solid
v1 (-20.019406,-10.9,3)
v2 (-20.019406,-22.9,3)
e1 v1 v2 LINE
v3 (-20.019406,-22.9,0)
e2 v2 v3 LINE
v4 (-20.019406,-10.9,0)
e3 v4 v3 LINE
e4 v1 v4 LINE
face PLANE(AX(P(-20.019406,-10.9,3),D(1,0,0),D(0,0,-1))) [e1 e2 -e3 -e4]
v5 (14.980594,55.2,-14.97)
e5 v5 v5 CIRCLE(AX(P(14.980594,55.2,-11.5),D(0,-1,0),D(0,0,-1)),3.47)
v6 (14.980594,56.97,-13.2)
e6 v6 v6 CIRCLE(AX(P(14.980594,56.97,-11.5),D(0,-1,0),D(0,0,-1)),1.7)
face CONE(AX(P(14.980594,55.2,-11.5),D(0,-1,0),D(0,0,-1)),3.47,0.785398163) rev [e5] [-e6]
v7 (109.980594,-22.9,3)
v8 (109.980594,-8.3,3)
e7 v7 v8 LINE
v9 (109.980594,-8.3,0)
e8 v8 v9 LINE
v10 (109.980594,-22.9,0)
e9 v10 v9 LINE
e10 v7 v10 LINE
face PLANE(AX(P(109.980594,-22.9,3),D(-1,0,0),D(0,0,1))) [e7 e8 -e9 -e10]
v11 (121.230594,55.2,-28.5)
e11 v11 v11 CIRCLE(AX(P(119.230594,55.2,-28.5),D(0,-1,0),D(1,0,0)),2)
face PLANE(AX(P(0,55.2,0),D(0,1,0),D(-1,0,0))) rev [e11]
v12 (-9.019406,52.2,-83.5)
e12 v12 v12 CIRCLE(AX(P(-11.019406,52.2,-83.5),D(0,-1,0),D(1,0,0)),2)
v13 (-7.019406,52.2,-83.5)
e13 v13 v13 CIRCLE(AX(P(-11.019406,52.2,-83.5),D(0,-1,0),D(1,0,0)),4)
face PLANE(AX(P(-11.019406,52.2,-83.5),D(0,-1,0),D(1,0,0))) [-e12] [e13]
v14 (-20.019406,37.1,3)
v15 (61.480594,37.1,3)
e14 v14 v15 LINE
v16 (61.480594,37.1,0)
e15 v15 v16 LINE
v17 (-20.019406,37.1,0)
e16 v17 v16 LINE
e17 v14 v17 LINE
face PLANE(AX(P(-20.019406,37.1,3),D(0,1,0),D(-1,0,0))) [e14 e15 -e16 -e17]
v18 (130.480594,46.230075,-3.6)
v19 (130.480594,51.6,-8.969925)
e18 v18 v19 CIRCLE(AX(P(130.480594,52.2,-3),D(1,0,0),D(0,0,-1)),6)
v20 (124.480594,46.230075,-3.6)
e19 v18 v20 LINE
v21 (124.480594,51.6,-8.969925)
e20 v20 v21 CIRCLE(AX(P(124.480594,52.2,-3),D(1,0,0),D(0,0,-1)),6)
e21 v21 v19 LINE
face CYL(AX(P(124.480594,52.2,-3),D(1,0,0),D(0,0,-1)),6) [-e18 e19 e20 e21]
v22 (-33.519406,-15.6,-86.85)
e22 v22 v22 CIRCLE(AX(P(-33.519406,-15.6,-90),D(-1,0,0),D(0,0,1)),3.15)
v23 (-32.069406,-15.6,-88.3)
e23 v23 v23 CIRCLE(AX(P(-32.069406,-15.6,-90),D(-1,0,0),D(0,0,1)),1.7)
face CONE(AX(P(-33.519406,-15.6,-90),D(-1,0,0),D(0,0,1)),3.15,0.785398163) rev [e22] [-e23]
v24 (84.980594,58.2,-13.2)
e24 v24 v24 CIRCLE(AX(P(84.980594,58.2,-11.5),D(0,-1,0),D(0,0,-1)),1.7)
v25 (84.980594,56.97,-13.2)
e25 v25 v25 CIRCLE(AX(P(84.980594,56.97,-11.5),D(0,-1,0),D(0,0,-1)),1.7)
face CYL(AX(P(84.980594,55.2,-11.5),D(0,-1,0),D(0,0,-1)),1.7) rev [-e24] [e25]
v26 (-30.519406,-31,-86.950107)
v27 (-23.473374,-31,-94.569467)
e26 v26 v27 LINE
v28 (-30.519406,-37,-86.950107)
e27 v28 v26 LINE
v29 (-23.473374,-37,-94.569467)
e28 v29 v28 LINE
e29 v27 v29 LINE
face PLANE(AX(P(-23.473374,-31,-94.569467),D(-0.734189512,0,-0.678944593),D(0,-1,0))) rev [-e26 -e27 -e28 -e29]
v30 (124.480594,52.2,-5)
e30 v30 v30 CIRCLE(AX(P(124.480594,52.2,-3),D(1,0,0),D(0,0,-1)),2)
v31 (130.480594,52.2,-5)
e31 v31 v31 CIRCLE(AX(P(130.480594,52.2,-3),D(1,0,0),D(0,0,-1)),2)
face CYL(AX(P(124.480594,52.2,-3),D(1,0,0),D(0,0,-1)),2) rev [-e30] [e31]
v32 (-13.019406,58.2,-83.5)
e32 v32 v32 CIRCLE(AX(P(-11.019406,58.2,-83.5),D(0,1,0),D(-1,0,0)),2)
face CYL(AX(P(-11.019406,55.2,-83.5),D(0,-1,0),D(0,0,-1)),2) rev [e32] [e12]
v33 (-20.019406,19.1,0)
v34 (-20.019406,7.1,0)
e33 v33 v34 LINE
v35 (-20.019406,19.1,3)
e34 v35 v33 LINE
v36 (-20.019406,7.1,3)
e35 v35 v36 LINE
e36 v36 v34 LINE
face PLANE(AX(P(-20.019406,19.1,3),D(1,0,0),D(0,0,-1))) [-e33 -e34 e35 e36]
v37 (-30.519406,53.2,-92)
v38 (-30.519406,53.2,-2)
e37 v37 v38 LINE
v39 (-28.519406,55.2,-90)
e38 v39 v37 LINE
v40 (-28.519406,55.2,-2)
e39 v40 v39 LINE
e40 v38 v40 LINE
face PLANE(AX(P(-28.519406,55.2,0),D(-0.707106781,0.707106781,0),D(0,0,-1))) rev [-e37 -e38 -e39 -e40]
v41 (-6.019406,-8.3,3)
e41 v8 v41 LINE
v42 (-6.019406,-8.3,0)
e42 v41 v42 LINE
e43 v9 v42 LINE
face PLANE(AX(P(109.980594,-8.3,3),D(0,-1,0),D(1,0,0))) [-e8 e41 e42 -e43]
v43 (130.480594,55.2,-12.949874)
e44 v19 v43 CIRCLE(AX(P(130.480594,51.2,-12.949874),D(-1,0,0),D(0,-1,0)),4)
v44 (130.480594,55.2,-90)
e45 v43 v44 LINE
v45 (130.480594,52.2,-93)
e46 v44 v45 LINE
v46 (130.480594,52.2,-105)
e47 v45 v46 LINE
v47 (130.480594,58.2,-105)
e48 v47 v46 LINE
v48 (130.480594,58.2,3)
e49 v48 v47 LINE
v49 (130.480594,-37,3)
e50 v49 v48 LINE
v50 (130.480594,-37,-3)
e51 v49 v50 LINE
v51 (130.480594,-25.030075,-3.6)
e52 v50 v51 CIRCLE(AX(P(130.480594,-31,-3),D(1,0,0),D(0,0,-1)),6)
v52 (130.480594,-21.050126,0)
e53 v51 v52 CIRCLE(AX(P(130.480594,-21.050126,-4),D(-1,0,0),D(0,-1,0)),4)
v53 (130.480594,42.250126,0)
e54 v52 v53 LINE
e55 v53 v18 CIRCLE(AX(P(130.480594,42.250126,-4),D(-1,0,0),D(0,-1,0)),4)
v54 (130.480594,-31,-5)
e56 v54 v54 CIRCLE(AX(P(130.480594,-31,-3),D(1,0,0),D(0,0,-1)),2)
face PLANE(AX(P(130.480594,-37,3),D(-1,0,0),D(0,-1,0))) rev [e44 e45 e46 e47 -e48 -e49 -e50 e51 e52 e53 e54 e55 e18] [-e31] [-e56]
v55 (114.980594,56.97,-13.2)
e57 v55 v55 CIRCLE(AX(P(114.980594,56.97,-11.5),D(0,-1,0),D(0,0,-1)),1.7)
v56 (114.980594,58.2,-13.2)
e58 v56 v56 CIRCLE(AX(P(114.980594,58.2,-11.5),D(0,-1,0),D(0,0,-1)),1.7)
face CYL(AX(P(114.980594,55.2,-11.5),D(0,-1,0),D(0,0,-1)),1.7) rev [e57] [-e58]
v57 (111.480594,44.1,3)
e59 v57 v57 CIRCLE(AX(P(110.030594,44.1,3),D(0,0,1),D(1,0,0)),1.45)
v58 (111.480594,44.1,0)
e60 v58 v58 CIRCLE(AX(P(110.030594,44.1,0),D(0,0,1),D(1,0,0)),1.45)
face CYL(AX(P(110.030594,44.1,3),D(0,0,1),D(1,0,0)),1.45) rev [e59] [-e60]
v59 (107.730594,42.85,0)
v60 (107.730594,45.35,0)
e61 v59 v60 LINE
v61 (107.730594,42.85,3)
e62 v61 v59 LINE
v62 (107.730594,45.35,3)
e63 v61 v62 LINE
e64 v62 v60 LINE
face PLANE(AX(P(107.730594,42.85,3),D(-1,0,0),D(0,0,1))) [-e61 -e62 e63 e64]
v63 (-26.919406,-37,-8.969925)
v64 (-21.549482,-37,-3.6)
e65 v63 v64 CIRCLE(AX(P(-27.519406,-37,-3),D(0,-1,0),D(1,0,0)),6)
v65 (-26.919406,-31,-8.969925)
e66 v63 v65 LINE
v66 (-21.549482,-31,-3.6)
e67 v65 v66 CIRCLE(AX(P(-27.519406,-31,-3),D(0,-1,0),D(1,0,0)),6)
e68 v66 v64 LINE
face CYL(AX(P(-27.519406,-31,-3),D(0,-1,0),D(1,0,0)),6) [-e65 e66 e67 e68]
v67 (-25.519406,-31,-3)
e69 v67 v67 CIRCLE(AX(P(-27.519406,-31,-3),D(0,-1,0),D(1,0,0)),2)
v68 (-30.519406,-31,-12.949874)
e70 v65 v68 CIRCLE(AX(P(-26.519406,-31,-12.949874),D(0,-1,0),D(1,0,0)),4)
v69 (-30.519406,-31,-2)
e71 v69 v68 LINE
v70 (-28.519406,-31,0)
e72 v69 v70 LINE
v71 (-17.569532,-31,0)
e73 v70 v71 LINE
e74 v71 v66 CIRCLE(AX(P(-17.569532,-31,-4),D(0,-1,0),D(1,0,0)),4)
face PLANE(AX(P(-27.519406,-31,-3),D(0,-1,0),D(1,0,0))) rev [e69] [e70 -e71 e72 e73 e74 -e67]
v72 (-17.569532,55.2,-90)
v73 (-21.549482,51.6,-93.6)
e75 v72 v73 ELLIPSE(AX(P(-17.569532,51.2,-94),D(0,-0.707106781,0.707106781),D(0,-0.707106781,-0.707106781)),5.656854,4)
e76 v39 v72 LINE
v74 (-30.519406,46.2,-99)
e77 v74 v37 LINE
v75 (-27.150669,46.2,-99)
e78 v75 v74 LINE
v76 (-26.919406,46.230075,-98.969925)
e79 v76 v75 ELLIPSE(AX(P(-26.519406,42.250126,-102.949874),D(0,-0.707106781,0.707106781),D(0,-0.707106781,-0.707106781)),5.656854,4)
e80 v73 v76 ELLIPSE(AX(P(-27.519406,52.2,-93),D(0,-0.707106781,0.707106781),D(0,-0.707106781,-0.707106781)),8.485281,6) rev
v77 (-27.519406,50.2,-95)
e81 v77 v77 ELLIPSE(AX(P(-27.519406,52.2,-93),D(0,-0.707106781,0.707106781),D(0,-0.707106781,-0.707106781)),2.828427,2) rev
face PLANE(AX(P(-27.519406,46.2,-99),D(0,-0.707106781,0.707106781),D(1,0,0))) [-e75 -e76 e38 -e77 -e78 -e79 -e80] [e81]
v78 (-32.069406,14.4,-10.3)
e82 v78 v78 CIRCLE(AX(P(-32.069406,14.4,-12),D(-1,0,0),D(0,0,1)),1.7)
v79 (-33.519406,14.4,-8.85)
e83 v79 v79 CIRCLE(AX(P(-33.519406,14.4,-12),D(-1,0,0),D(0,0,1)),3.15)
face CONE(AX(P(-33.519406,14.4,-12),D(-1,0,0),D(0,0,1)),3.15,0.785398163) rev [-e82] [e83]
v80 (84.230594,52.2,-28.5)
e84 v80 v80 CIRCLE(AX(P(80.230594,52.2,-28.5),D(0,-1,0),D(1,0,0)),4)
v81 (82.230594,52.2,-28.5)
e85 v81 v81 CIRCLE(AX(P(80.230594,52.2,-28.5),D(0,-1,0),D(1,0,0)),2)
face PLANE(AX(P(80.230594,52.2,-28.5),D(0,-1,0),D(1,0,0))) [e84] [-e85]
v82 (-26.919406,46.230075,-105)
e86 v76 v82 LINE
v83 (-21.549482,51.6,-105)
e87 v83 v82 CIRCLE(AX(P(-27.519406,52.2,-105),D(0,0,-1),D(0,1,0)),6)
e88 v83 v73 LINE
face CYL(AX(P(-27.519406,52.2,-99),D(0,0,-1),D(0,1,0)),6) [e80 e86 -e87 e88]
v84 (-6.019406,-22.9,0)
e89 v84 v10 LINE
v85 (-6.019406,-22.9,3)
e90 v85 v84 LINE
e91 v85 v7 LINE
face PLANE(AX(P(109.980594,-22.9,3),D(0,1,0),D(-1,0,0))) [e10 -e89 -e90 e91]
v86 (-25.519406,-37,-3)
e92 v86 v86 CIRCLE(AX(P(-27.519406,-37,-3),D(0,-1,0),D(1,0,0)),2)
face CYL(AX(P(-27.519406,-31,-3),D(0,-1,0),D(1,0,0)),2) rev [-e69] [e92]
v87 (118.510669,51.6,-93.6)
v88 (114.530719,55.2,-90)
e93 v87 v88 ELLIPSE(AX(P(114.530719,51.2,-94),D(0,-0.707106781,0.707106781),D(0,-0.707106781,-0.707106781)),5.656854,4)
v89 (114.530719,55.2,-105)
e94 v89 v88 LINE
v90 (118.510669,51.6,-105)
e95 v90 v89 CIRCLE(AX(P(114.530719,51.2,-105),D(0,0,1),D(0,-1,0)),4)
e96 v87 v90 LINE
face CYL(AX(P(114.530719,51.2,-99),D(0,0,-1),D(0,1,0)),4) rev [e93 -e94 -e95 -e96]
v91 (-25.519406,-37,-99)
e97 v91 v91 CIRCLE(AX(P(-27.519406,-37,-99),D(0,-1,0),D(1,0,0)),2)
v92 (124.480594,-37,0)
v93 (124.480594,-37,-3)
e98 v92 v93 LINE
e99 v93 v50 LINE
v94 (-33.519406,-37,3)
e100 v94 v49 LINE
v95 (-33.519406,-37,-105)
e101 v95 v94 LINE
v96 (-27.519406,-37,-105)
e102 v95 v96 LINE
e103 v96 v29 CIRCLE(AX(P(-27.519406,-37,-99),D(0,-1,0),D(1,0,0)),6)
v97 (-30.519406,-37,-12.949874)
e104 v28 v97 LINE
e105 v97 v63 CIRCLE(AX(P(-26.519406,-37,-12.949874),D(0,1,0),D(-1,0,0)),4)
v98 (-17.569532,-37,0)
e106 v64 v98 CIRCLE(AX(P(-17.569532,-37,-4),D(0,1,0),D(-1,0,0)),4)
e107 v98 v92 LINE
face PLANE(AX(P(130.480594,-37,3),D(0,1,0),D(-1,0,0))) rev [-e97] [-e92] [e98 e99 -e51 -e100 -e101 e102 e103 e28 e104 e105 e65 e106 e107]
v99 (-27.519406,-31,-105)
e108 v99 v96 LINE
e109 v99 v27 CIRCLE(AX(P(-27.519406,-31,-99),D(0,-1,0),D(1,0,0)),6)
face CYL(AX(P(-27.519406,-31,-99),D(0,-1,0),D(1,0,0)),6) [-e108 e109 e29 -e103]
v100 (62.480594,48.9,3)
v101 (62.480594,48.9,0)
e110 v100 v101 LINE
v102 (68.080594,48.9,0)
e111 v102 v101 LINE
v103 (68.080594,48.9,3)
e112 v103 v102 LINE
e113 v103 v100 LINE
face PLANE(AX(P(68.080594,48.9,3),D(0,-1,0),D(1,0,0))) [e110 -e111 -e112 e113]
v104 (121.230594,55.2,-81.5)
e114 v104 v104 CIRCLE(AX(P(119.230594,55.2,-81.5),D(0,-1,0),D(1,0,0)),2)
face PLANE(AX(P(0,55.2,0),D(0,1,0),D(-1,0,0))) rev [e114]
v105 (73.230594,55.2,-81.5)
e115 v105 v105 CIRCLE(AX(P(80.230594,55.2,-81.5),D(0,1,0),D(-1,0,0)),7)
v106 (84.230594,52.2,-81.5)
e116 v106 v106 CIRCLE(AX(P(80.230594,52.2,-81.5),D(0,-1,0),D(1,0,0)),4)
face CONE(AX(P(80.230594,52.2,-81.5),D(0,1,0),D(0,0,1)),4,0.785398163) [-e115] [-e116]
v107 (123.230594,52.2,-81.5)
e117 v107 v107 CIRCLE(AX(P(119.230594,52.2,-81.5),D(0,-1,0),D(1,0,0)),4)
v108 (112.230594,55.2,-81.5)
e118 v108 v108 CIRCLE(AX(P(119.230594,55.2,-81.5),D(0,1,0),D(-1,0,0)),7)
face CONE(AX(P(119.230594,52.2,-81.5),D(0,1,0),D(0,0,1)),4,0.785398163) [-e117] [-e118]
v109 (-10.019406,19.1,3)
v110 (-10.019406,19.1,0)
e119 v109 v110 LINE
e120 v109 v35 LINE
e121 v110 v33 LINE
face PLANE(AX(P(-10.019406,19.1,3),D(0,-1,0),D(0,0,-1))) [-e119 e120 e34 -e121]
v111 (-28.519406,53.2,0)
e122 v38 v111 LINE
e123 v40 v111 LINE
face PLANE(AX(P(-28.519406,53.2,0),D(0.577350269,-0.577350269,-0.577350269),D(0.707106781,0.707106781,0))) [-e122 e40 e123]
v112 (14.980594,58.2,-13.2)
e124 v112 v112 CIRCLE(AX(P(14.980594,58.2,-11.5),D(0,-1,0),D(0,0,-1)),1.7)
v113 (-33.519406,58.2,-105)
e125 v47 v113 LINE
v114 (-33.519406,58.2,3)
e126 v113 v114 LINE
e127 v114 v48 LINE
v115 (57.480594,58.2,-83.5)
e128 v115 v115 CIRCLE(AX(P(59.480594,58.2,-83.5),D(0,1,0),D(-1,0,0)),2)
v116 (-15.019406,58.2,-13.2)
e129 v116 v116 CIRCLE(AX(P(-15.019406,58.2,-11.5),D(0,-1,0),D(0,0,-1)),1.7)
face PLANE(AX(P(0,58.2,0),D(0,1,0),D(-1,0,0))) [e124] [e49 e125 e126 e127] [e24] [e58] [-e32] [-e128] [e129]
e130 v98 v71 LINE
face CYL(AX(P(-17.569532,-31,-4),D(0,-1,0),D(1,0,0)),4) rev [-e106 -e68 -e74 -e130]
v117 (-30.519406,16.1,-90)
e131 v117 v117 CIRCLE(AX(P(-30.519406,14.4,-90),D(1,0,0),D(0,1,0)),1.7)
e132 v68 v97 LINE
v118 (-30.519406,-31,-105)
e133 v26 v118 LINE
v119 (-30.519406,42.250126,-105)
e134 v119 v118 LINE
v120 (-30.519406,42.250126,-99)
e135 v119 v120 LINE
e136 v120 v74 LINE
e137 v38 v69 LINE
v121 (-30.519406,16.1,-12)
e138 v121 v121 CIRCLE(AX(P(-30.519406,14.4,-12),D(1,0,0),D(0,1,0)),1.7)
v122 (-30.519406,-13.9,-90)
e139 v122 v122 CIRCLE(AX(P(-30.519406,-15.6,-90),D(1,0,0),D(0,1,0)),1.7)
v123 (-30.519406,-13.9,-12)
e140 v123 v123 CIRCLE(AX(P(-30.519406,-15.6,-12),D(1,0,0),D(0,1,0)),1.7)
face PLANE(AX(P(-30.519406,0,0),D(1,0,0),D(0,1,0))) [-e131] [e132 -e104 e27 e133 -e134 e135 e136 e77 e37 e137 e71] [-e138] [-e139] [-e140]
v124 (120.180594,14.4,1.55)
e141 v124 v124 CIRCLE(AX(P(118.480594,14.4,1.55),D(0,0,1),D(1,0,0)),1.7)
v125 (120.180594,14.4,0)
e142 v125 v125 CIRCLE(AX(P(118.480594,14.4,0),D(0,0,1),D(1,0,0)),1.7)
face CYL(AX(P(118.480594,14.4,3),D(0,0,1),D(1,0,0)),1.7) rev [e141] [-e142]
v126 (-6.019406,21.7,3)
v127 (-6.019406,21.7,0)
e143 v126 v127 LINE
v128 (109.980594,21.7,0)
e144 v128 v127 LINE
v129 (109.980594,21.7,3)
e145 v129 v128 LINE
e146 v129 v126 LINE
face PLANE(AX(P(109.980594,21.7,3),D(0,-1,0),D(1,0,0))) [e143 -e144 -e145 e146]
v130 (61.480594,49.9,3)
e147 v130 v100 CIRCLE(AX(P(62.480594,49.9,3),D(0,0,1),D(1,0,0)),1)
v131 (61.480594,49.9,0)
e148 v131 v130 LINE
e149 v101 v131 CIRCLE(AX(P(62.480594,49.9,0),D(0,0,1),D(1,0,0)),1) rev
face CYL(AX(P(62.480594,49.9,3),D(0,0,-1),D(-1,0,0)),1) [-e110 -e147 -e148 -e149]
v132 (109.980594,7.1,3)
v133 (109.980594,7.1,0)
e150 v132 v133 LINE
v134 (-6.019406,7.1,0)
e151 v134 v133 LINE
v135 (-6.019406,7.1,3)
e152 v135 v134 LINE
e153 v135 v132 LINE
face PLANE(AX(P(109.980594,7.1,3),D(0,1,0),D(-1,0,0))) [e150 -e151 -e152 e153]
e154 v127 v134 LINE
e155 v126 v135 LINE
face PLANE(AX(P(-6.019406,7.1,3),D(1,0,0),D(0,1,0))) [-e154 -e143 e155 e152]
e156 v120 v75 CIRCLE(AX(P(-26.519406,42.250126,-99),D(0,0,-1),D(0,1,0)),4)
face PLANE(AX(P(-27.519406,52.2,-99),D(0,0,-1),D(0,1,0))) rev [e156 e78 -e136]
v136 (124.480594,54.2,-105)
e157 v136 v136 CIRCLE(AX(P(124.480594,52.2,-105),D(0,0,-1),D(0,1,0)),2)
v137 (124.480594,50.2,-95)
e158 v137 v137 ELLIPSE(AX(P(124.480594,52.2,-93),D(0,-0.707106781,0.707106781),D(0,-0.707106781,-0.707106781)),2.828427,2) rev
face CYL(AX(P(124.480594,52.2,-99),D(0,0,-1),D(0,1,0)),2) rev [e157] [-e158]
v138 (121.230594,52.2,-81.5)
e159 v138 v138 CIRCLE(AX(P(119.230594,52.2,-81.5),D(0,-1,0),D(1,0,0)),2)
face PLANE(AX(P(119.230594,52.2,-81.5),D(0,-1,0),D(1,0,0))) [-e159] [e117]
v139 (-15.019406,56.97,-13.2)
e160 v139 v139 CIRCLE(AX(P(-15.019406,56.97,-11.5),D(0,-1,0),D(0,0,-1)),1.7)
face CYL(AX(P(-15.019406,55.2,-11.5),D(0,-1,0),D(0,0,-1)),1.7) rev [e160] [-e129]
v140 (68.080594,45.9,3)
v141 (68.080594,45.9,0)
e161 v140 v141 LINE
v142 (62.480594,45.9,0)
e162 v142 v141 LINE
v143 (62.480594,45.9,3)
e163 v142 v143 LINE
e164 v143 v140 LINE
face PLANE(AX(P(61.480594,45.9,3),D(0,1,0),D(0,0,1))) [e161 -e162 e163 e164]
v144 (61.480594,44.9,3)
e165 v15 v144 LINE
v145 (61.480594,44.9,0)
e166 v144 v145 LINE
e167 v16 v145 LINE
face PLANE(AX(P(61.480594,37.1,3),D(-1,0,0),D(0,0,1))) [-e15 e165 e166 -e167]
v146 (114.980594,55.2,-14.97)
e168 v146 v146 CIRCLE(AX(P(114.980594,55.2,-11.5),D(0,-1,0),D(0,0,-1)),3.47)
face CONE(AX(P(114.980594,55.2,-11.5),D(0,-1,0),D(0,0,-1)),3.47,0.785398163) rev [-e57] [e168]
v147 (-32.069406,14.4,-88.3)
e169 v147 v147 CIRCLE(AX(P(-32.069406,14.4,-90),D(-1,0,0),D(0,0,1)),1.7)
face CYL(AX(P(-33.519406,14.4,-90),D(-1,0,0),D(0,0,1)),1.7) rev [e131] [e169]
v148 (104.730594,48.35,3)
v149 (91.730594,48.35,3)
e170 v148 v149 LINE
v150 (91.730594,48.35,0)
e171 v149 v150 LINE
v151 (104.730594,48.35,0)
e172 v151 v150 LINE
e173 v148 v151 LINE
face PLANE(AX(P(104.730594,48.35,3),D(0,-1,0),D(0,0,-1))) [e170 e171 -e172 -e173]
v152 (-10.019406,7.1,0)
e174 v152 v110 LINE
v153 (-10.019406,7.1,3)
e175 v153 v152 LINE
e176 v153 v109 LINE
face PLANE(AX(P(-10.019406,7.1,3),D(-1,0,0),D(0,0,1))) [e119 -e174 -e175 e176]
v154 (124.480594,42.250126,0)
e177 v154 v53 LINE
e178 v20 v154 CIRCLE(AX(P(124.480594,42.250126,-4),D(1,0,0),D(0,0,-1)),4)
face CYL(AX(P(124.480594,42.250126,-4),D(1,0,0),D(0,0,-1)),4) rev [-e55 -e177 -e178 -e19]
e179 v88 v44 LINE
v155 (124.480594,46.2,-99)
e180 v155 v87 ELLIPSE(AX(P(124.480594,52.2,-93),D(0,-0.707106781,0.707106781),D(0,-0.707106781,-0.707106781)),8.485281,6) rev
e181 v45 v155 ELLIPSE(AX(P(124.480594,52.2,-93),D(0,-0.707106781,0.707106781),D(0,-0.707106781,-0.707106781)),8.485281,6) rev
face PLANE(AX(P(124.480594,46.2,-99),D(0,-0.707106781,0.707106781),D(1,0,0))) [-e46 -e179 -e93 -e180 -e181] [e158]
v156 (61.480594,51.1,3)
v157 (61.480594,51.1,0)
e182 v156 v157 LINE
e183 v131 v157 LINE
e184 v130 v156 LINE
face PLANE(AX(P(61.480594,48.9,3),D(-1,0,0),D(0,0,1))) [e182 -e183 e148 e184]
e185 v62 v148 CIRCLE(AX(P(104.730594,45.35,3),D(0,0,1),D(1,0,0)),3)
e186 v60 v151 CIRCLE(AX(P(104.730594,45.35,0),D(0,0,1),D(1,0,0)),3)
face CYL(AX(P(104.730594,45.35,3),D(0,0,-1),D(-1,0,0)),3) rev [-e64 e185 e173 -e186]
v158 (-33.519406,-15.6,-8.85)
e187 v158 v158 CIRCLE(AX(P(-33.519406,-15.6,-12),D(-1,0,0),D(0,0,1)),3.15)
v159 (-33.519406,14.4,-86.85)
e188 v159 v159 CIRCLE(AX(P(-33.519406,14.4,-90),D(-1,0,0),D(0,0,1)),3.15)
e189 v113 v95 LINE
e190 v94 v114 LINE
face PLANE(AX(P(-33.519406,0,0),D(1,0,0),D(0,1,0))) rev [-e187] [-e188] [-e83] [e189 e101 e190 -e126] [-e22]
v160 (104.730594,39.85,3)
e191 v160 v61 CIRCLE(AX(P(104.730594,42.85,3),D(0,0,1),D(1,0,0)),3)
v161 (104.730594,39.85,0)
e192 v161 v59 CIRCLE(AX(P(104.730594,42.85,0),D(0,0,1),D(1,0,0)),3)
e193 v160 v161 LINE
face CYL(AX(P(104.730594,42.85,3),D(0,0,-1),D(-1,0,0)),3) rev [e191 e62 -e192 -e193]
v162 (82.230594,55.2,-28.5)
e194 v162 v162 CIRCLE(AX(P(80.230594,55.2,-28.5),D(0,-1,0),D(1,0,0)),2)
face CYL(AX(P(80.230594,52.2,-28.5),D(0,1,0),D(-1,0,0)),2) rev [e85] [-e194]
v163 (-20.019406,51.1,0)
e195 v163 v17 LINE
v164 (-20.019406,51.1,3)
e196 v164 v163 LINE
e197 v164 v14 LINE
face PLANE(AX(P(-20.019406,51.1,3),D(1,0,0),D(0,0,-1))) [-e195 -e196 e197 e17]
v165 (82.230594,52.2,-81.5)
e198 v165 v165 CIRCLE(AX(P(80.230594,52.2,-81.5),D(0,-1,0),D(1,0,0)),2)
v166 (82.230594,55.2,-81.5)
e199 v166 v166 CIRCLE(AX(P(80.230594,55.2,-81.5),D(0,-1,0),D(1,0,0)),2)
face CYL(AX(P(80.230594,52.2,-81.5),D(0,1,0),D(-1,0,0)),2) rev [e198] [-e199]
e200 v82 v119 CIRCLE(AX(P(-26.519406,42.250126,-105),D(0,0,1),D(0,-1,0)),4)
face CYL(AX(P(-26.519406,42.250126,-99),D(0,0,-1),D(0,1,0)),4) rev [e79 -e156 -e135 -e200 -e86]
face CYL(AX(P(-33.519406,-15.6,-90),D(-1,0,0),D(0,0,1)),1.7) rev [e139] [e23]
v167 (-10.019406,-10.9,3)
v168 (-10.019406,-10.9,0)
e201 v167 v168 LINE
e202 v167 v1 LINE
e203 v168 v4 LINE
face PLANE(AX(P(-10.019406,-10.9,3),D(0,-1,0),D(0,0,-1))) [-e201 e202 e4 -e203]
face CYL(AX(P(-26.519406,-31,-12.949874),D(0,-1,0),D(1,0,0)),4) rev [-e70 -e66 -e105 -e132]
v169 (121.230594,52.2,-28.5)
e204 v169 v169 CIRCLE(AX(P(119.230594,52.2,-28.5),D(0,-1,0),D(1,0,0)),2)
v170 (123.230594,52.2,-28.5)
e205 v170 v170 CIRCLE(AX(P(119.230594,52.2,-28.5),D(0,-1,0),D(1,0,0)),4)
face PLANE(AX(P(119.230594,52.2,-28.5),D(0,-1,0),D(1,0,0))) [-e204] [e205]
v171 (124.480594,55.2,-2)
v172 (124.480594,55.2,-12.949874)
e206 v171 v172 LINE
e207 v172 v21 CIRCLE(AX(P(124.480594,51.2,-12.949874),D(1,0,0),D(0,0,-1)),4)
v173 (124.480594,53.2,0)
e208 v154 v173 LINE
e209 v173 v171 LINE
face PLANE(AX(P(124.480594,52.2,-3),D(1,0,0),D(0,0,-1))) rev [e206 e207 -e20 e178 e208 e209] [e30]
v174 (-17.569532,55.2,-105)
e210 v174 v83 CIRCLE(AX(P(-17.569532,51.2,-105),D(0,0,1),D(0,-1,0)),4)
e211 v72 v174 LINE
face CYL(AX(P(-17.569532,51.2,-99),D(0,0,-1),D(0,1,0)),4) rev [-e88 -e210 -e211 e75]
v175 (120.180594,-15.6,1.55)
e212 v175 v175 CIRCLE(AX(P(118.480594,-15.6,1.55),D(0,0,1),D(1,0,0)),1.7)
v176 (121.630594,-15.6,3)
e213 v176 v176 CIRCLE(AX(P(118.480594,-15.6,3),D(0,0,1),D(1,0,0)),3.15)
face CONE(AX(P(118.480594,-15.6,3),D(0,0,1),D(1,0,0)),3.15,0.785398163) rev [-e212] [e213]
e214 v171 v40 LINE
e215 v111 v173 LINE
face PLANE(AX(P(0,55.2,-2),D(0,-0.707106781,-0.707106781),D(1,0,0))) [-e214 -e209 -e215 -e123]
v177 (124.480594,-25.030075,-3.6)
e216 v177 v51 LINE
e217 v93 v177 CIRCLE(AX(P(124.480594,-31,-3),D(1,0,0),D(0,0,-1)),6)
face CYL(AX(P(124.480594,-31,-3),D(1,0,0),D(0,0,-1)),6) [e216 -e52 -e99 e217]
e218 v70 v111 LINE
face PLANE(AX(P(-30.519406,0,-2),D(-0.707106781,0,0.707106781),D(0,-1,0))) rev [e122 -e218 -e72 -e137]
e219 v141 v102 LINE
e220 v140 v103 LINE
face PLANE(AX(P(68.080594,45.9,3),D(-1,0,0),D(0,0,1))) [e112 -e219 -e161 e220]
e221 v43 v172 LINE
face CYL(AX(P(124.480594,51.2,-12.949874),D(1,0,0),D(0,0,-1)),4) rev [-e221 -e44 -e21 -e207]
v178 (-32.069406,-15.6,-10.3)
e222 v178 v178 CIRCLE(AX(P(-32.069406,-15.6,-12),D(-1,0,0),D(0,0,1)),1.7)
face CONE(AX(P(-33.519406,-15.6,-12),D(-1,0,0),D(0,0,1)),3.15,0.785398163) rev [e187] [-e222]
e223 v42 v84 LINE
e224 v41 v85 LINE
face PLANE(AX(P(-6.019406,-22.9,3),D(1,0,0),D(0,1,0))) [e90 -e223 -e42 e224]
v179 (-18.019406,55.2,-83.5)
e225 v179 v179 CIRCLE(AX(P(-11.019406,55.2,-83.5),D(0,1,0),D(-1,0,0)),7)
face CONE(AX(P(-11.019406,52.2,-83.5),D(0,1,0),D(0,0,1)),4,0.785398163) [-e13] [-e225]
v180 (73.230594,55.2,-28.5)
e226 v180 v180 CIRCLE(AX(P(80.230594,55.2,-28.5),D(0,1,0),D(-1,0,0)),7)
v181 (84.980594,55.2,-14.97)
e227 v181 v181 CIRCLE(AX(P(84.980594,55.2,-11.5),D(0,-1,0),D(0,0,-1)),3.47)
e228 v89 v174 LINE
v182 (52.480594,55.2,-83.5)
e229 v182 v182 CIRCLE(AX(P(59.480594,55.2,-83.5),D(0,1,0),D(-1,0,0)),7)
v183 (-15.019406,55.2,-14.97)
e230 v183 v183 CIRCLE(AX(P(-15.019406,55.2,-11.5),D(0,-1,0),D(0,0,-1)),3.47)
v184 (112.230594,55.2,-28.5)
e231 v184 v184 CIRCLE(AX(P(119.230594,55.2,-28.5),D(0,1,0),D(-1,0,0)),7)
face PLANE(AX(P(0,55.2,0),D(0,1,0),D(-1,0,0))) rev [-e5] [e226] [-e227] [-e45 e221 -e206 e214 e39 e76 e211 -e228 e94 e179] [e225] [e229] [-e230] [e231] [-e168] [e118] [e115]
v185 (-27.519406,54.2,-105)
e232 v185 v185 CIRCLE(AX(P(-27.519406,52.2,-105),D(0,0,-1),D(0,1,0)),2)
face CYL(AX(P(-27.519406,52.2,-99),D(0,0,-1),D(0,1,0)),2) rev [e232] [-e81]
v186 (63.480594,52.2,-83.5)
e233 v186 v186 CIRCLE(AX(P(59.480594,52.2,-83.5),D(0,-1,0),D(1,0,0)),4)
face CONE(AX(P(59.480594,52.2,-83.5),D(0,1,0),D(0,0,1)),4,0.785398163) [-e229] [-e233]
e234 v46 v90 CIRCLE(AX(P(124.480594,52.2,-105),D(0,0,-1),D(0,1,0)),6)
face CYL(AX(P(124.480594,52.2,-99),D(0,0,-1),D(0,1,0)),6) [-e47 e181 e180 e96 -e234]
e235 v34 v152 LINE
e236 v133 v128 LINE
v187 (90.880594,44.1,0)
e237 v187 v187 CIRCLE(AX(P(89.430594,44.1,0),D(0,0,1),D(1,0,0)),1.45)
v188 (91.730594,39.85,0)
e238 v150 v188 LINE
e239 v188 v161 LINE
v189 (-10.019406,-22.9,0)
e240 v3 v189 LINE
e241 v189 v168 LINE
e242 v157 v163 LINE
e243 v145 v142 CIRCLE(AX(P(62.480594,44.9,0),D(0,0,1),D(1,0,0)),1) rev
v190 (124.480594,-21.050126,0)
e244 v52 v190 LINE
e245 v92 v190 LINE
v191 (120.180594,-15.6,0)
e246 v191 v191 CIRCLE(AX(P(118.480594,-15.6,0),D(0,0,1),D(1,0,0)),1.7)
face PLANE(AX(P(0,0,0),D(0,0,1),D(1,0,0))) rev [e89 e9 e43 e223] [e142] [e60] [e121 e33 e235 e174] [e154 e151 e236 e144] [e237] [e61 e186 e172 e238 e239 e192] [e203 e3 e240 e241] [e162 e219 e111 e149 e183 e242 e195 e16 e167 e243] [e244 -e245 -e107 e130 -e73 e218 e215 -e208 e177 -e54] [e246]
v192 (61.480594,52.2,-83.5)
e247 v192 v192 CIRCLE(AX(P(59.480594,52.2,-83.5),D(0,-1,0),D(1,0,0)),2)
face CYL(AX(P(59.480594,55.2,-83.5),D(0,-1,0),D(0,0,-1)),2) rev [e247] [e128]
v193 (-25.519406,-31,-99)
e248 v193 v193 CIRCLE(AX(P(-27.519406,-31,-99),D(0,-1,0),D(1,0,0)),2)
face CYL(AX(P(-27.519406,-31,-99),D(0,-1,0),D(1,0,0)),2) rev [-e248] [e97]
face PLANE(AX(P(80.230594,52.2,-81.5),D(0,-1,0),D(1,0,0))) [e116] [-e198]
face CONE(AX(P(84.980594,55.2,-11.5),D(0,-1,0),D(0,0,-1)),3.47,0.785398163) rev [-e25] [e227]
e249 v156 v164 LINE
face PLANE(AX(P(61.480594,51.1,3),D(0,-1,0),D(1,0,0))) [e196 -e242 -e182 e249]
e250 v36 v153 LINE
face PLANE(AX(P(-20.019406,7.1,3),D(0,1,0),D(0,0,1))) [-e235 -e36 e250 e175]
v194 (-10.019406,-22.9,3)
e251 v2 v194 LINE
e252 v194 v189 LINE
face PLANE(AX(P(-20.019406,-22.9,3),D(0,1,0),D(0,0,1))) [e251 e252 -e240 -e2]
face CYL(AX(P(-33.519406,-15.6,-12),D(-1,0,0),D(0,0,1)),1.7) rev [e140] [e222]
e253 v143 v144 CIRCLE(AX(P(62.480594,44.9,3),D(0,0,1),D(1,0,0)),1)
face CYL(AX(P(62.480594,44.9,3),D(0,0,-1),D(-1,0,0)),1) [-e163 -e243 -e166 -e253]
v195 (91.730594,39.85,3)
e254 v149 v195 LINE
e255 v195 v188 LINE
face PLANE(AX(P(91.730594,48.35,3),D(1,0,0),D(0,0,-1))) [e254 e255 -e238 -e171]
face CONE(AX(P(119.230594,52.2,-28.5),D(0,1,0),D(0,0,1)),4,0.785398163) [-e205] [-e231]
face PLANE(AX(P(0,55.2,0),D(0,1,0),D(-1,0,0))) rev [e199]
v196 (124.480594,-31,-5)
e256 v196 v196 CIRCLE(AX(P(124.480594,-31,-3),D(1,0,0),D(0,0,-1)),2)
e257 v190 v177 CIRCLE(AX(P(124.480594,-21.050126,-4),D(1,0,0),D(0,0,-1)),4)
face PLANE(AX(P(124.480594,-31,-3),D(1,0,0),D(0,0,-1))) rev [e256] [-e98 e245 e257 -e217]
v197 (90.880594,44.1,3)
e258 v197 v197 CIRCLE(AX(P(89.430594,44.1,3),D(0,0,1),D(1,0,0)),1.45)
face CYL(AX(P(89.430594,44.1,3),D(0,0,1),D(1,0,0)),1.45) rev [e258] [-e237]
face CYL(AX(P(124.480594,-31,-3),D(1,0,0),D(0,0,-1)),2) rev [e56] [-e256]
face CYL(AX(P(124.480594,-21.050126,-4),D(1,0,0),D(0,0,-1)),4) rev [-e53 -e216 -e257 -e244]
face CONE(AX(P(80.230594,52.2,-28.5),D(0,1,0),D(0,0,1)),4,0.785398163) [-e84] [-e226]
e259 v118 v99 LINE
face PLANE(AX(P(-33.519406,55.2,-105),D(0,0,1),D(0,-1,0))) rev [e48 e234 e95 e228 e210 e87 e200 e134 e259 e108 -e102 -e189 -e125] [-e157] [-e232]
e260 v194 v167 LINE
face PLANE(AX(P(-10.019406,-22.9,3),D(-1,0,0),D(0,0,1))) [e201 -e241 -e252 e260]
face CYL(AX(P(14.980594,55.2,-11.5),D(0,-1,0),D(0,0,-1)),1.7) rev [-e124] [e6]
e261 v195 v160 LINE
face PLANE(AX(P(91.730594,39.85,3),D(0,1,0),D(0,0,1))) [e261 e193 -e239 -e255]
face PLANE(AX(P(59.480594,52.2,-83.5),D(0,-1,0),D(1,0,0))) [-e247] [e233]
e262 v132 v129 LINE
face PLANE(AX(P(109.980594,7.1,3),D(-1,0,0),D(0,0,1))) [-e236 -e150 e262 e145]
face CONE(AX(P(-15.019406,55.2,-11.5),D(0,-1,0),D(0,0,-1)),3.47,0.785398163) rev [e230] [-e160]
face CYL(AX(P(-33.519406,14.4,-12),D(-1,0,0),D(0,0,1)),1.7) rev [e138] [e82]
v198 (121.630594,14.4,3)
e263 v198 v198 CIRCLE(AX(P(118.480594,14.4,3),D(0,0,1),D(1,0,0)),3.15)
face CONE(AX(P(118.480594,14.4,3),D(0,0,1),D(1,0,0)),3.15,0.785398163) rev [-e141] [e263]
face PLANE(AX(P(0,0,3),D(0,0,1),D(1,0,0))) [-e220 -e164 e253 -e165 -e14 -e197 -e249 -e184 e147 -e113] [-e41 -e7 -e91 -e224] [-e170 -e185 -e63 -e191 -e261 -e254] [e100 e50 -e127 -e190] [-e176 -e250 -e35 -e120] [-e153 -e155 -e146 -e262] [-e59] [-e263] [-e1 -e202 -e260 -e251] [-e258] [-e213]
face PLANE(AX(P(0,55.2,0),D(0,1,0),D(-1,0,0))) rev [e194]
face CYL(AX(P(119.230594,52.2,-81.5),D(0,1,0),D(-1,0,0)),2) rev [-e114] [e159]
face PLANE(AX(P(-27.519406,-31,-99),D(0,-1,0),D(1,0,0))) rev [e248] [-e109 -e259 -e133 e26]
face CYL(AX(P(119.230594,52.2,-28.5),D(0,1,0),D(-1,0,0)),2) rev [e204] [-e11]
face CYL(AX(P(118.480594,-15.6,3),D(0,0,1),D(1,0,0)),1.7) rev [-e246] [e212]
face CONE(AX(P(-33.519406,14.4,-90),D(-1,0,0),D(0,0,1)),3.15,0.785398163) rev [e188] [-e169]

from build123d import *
from build123d.topology import SkipClean

# Parameters (mm, degrees)
SKETCH1_W                                      = 161
SKETCH1_H                                      = 92.2
SKETCH1_W_2                                    = 116
SKETCH1_H_2                                    = 14.6
SKETCH1_W_3                                    = 10
SKETCH1_H_3                                    = 12
BOSS_EXTRUDE1_DEPTH                            = 3
SKETCH4_W                                      = 108
SKETCH4_H                                      = 92.2
BOSS_EXTRUDE2_DEPTH                            = 3
SKETCH5_W                                      = 164
SKETCH5_H                                      = 108
BOSS_EXTRUDE3_DEPTH                            = 3
CSK_FOR_M3_FLAT_HEAD_MACHINE_SCREW1_AT_2_COUNT = 2
CSK_FOR_M3_FLAT_HEAD_MACHINE_SCREW1_AT_2_PITCH = 30
CSK_FOR_M3_FLAT_HEAD_MACHINE_SCREW2_AT_2_COUNT = 2
CSK_FOR_M3_FLAT_HEAD_MACHINE_SCREW2_AT_2_PITCH = 30
CSK_FOR_M3_FLAT_HEAD_MACHINE_SCREW2_AT_3_COUNT = 2
CSK_FOR_M3_FLAT_HEAD_MACHINE_SCREW2_AT_3_PITCH = 78
CSK_FOR_M3_FLAT_HEAD_MACHINE_SCREW2_AT_4_COUNT = 2
CSK_FOR_M3_FLAT_HEAD_MACHINE_SCREW2_AT_4_PITCH = 83.570329663
SKETCH8_R                                      = 6
SKETCH8_R_2                                    = 2
BOSS_EXTRUDE5_DEPTH                            = 6
FILLET2_R                                      = 4
SKETCH10_R                                     = 6
SKETCH10_R_2                                   = 2
BOSS_EXTRUDE6_DEPTH                            = 6
FILLET3_R                                      = 4
SKETCH11_R                                     = 6
SKETCH11_R_2                                   = 2
BOSS_EXTRUDE7_DEPTH                            = 6
FILLET4_R                                      = 4
CHAMFER1_START                                 = -99
CHAMFER1_OUTLINE_R                             = 2
CHAMFER1_DEPTH                                 = 9
CHAMFER1_START_2                               = -30.519406217
CHAMFER1_2_DEPTH                               = 161.519406217
F_4_0MM_DOWEL_HOLE1_D                          = 4
SKETCH14_R                                     = 4
SKETCH14_R_2                                   = 2
BOSS_EXTRUDE8_DEPTH                            = 3
CHAMFER3_SIZE                                  = 3
FILLET5_R                                      = 1
M2_5_CLEARANCE_HOLE1_D                         = 2.9
M2_5_CLEARANCE_HOLE1_DEPTH                     = 5
M2_5_CLEARANCE_HOLE1_TIP                       = 0.871247898
CSK_FOR_M3_SOCKET_COUNTERSUNK_HEAD_S_2_COUNT   = 2
CSK_FOR_M3_SOCKET_COUNTERSUNK_HEAD_S_2_PITCH   = 30
CSK_FOR_M3_SOCKET_COUNTERSUNK_HEAD_S_3_COUNT   = 2
CSK_FOR_M3_SOCKET_COUNTERSUNK_HEAD_S_3_PITCH   = 100
CSK_FOR_M3_SOCKET_COUNTERSUNK_HEAD_S_4_COUNT   = 2
CSK_FOR_M3_SOCKET_COUNTERSUNK_HEAD_S_4_PITCH   = 130
CHAMFER4_SIZE                                  = 2


with BuildPart() as part:
    # Sketch1 → Boss-Extrude1 (new body)
    with BuildSketch(Plane.XY):
        with Locations((49.980593783, 9.1)):
            Rectangle(SKETCH1_W, SKETCH1_H)
        with Locations((51.980593783, -15.6)):
            Rectangle(SKETCH1_W_2, SKETCH1_H_2, mode=Mode.SUBTRACT)
        with Locations((51.980593783, 14.4)):
            Rectangle(SKETCH1_W_2, SKETCH1_H_2, mode=Mode.SUBTRACT)
        Polygon((61.480593783, 51.1), (-20.019406217, 51.1), (-20.019406217, 37.1), (61.480593783, 37.1), (61.480593783, 45.9), (68.080593783, 45.9), (68.080593783, 48.9), (61.480593783, 48.9), align=None, mode=Mode.SUBTRACT)
        with BuildLine():
            Line((104.730593685, 48.35), (91.730593783, 48.35))
            Line((91.730593783, 48.35), (91.730593783, 39.85))
            Line((91.730593783, 39.85), (104.730593685, 39.85))
            ThreePointArc((104.730593685, 39.85), (106.851914092, 40.728679622), (107.730593783, 42.85))
            Line((107.730593783, 42.85), (107.730593783, 45.35))
            ThreePointArc((107.730593783, 45.35), (106.851914092, 47.471320378), (104.730593685, 48.35))
        make_face(mode=Mode.SUBTRACT)
        with Locations((-15.019406217, -16.9)):
            Rectangle(SKETCH1_W_3, SKETCH1_H_3, mode=Mode.SUBTRACT)
        with Locations((-15.019406217, 13.1)):
            Rectangle(SKETCH1_W_3, SKETCH1_H_3, mode=Mode.SUBTRACT)
    extrude(amount=BOSS_EXTRUDE1_DEPTH)

    # Sketch4 → Boss-Extrude2 (add)
    with BuildSketch(Plane.ZY.offset(30.519406217)):
        with Locations((-51, 9.1)):
            Rectangle(SKETCH4_W, SKETCH4_H)
    extrude(amount=BOSS_EXTRUDE2_DEPTH)

    # Sketch5 → Boss-Extrude3 (add)
    with BuildSketch(Plane(origin=(0, 55.2, 0), x_dir=(1, 0, 0), z_dir=(0, 1, 0))):
        with Locations((48.480593783, 51)):
            Rectangle(SKETCH5_W, SKETCH5_H)
    extrude(amount=BOSS_EXTRUDE3_DEPTH)

    # Sketch3 → CSK for M3 Flat Head Machine Screw1 (revolve, cut)
    with BuildSketch(Plane(origin=(118.480593783, 14.4, 3), x_dir=(0, -1, 0), z_dir=(1, 0, 0))):
        Polygon((0, 0), (0, 3), (1.7, 3), (1.7, 1.45), (3.15, 0), align=None)
    csk_for_m3_flat_head_machine_screw1 = revolve(axis=Axis((118.480593783, 14.4, 9.35), (0, 0, -1)), mode=Mode.SUBTRACT)

    # CSK for M3 Flat Head Machine Screw1 at 2: CSK for M3 Flat Head Machine Screw1 ×2
    with Locations(*[(0, -i * CSK_FOR_M3_FLAT_HEAD_MACHINE_SCREW1_AT_2_PITCH, 0) for i in range(1, CSK_FOR_M3_FLAT_HEAD_MACHINE_SCREW1_AT_2_COUNT)]):
        add(csk_for_m3_flat_head_machine_screw1, mode=Mode.SUBTRACT)

    # Sketch7 → CSK for M3 Flat Head Machine Screw2 (revolve, cut)
    with BuildSketch(Plane(origin=(-33.519406217, 14.4, -90), x_dir=(0, 0, 1), z_dir=(0, 1, 0))):
        Polygon((0, 0), (0, 3), (1.7, 3), (1.7, 1.45), (3.15, 0), align=None)
    csk_for_m3_flat_head_machine_screw2 = revolve(axis=Axis((-39.869406217, 14.4, -90), (1, 0, 0)), mode=Mode.SUBTRACT)

    # CSK for M3 Flat Head Machine Screw2 at 2: CSK for M3 Flat Head Machine Screw2 ×2
    with Locations(*[(0, -i * CSK_FOR_M3_FLAT_HEAD_MACHINE_SCREW2_AT_2_PITCH, 0) for i in range(1, CSK_FOR_M3_FLAT_HEAD_MACHINE_SCREW2_AT_2_COUNT)]):
        add(csk_for_m3_flat_head_machine_screw2, mode=Mode.SUBTRACT)

    # CSK for M3 Flat Head Machine Screw2 at 3: CSK for M3 Flat Head Machine Screw2 ×2
    with Locations(*[(0, 0, i * CSK_FOR_M3_FLAT_HEAD_MACHINE_SCREW2_AT_3_PITCH) for i in range(1, CSK_FOR_M3_FLAT_HEAD_MACHINE_SCREW2_AT_3_COUNT)]):
        add(csk_for_m3_flat_head_machine_screw2, mode=Mode.SUBTRACT)

    # CSK for M3 Flat Head Machine Screw2 at 4: CSK for M3 Flat Head Machine Screw2 ×2
    with Locations(*[Vector(0, -0.35897907930886735, 0.9333456062030602) * (i * CSK_FOR_M3_FLAT_HEAD_MACHINE_SCREW2_AT_4_PITCH) for i in range(1, CSK_FOR_M3_FLAT_HEAD_MACHINE_SCREW2_AT_4_COUNT)]):
        add(csk_for_m3_flat_head_machine_screw2, mode=Mode.SUBTRACT)

    # Sketch8 → Boss-Extrude5 (add)
    # profile 1 of 2: a face of its own
    with BuildSketch(Plane.XZ.offset(37)):
        with Locations((-27.519406217, -3)):
            Circle(SKETCH8_R)
        with Locations((-27.519406217, -3)):
            Circle(SKETCH8_R_2, mode=Mode.SUBTRACT)
    # profile 2 of 2: a face of its own
    with BuildSketch(Plane.XZ.offset(37)):
        with BuildLine():
            Line((-27.519406217, -105), (-33.519406217, -105))
            Line((-33.519406217, -105), (-33.519406217, -99))
            ThreePointArc((-33.519406217, -99), (-23.27676553, -94.757359313), (-27.519406217, -105))
        make_face()
        with Locations((-27.519406217, -99)):
            Circle(SKETCH8_R_2, mode=Mode.SUBTRACT)
    extrude(amount=-BOSS_EXTRUDE5_DEPTH)

    # Fillet2
    fillet2_edges = [part.edges().sort_by_distance(p)[0] for p in [
        (-30.519406217, -34, -8.196152423),
        (-22.323253794, -34, 0),
    ]]
    fillet(fillet2_edges, radius=FILLET2_R)

    # Sketch10 → Boss-Extrude6 (add)
    # profile 1 of 2: a face of its own
    with BuildSketch(Plane(origin=(130.480593783, 0, 0), x_dir=(0, 0, -1), z_dir=(1, 0, 0))):
        with Locations((3, 52.2)):
            Circle(SKETCH10_R)
        with Locations((3, 52.2)):
            Circle(SKETCH10_R_2, mode=Mode.SUBTRACT)
    # profile 2 of 2: a face of its own
    with BuildSketch(Plane(origin=(130.480593783, 0, 0), x_dir=(0, 0, -1), z_dir=(1, 0, 0))):
        with BuildLine():
            Line((-3, -31), (-3, -37))
            Line((-3, -37), (3, -37))
            ThreePointArc((3, -37), (7.242640687, -26.757359313), (-3, -31))
        make_face()
        with Locations((3, -31)):
            Circle(SKETCH10_R_2, mode=Mode.SUBTRACT)
    extrude(amount=-BOSS_EXTRUDE6_DEPTH)

    # Fillet3
    fillet3_edges = [part.edges().sort_by_distance(p)[0] for p in [
        (127.480593783, 47.003847577, 0),
        (127.480593783, 55.2, -8.196152423),
        (127.480593783, -25.803847577, 0),
    ]]
    fillet(fillet3_edges, radius=FILLET3_R)

    # Sketch11 → Boss-Extrude7 (add)
    # profile 1 of 2: a face of its own
    with BuildSketch(Plane(origin=(0, 0, -105), x_dir=(-1, 0, 0), z_dir=(0, 0, -1))):
        with Locations((27.519406217, 52.2)):
            Circle(SKETCH11_R)
        with Locations(Location((27.519406217, 52.2, 0), (0, 0, 90))):
            Circle(SKETCH11_R_2, mode=Mode.SUBTRACT)
    # profile 2 of 2: a face of its own
    with BuildSketch(Plane(origin=(0, 0, -105), x_dir=(-1, 0, 0), z_dir=(0, 0, -1))):
        with BuildLine():
            Line((-124.480593783, 58.2), (-130.480593783, 58.2))
            Line((-130.480593783, 58.2), (-130.480593783, 52.2))
            ThreePointArc((-130.480593783, 52.2), (-120.237953096, 47.957359313), (-124.480593783, 58.2))
        make_face()
        with Locations(Location((-124.480593783, 52.2, 0), (0, 0, 90))):
            Circle(SKETCH11_R_2, mode=Mode.SUBTRACT)
    extrude(amount=-BOSS_EXTRUDE7_DEPTH)

    # Fillet4
    fillet4_edges = [part.edges().sort_by_distance(p)[0] for p in [
        (-30.519406217, 47.003847577, -102),
        (-22.323253794, 55.2, -102),
        (119.28444136, 55.2, -102),
    ]]
    fillet(fillet4_edges, radius=FILLET4_R)

    # Chamfer1: read off the stored shape, not the designer's step
    # Chamfer1 outline → Chamfer1 (add)
    # profile 1 of 2: a face of its own
    with SkipClean():  # the faces are left unmerged after this step: merging them gives an invalid solid
        with BuildSketch(Plane.XY.offset(CHAMFER1_START)):
            with BuildLine():
                ThreePointArc((-21.549481594, 51.6), (-20.252813419, 54.166479395), (-17.569531846, 55.2))
                Line((-17.569531846, 55.2), (-30.519406217, 55.2))
                Line((-30.519406217, 55.2), (-30.519406217, 42.250125629))
                ThreePointArc((-30.519406217, 42.250125629), (-29.485885612, 44.933407202), (-26.919406217, 46.230075377))
                ThreePointArc((-26.919406217, 46.230075377), (-23.27676553, 47.957359313), (-21.549481594, 51.6))
            make_face()
            with Locations((-27.519406217, 52.2)):
                Circle(CHAMFER1_OUTLINE_R, mode=Mode.SUBTRACT)
        # profile 2 of 2: a face of its own
        with BuildSketch(Plane.XY.offset(CHAMFER1_START)):
            with BuildLine():
                Line((130.480593783, 52.2), (130.480593783, 55.2))
                Line((130.480593783, 55.2), (114.530719412, 55.2))
                ThreePointArc((114.530719412, 55.2), (117.214000985, 54.166479395), (118.51066916, 51.6))
                ThreePointArc((118.51066916, 51.6), (124.780970433, 46.207523561), (130.480593783, 52.2))
            make_face()
            with Locations((124.480593783, 52.2)):
                Circle(CHAMFER1_OUTLINE_R, mode=Mode.SUBTRACT)
        extrude(amount=CHAMFER1_DEPTH)

    # Chamfer1 2 outline → Chamfer1 2 (cut)
    with SkipClean():  # the faces are left unmerged after this step: merging them gives an invalid solid
        with BuildSketch(Plane.YZ.offset(CHAMFER1_START_2)):
            Polygon((41, -99), (46.2, -99), (55.2, -90), (41, -90), align=None)
        extrude(amount=CHAMFER1_2_DEPTH, mode=Mode.SUBTRACT)
    add(part.part.scale(1), mode=Mode.REPLACE)  # the faces are merged on a copy

    # Chamfer2
    # the kernel refuses this chamfer: 22.12795032, 20 mm, written as the material it adds along each edge
    with BuildSketch(Plane(origin=(-30.519406217, -31, -93.803847577), x_dir=(0, 0, 1), z_dir=(0, -1, 0))) as chamfer2_piece_1:
        with BuildLine():
            Line((7.503584533, 0.600946089), (-1.415463722, -7.646978317))
            Line((-1.415463722, -7.646978317), (-1.742259107, -7.34854365))
            ThreePointArc((-1.742259107, -7.34854365), (0.270050722, -4.002882633), (-0.383267342, -0.221279503))
            Line((-0.383267342, -0.221279503), (0, 0.442559006))
            ThreePointArc((0, 0.442559006), (3.751792267, 0.442559006), (7.503584533, 1.043505096))
            Line((7.503584533, 1.043505096), (7.503584533, 0.600946089))
        make_face()
    extrude(amount=6)

    # Ø4.0mm Dowel Hole1 (through all)
    with Locations(Plane.XZ.offset(-55.2)):
        with Locations((-11.019406217, -83.5), (59.480593783, -83.5)):
            Hole(F_4_0MM_DOWEL_HOLE1_D / 2)

    # Sketch14 → Boss-Extrude8 (add)
    # profile 1 of 6: a face of its own
    with SkipClean():  # the faces are left unmerged after this step: merging them gives an invalid solid
        with BuildSketch(Plane.XZ.offset(-55.2)):
            with Locations(Location((-11.019406217, -83.5, 0), (0, 0, 180))):
                Circle(SKETCH14_R)
            with Locations((-11.019406217, -83.5)):
                Circle(SKETCH14_R_2, mode=Mode.SUBTRACT)
        # profile 2 of 6: a face of its own
        with BuildSketch(Plane.XZ.offset(-55.2)):
            with Locations(Location((59.480593783, -83.5, 0), (0, 0, 180))):
                Circle(SKETCH14_R)
            with Locations((59.480593783, -83.5)):
                Circle(SKETCH14_R_2, mode=Mode.SUBTRACT)
        # profile 3 of 6: a face of its own
        with BuildSketch(Plane.XZ.offset(-55.2)):
            with Locations(Location((80.230593783, -81.5, 0), (0, 0, 180))):
                Circle(SKETCH14_R)
            with Locations((80.230593783, -81.5)):
                Circle(SKETCH14_R_2, mode=Mode.SUBTRACT)
        # profile 4 of 6: a face of its own
        with BuildSketch(Plane.XZ.offset(-55.2)):
            with Locations(Location((119.230593783, -81.5, 0), (0, 0, 180))):
                Circle(SKETCH14_R)
            with Locations((119.230593783, -81.5)):
                Circle(SKETCH14_R_2, mode=Mode.SUBTRACT)
        # profile 5 of 6: a face of its own
        with BuildSketch(Plane.XZ.offset(-55.2)):
            with Locations(Location((80.230593783, -28.5, 0), (0, 0, 180))):
                Circle(SKETCH14_R)
            with Locations((80.230593783, -28.5)):
                Circle(SKETCH14_R_2, mode=Mode.SUBTRACT)
        # profile 6 of 6: a face of its own
        with BuildSketch(Plane.XZ.offset(-55.2)):
            with Locations(Location((119.230593783, -28.5, 0), (0, 0, 180))):
                Circle(SKETCH14_R)
            with Locations((119.230593783, -28.5)):
                Circle(SKETCH14_R_2, mode=Mode.SUBTRACT)
        extrude(amount=BOSS_EXTRUDE8_DEPTH)
    add(part.part.scale(1), mode=Mode.REPLACE)  # the faces are merged on a copy

    # Chamfer3
    chamfer3_edges = [part.edges().sort_by_distance(p)[0] for p in [
        (-7.019406217, 55.2, -83.5),
        (63.480593783, 55.2, -83.5),
        (84.230593783, 55.2, -81.5),
        (123.230593783, 55.2, -81.5),
        (84.230593783, 55.2, -28.5),
        (123.230593783, 55.2, -28.5),
    ]]
    chamfer(chamfer3_edges, length=CHAMFER3_SIZE - 0.0001)  # a hair under: the kernel refuses the full size

    # Fillet5
    fillet5_edges = [part.edges().sort_by_distance(p)[0] for p in [
        (61.480593783, 48.9, 1.5),
        (61.480593783, 45.9, 1.5),
    ]]
    fillet(fillet5_edges, radius=FILLET5_R)

    # M2.5 Clearance Hole1
    with Locations(Plane.XY.offset(3)):
        with Locations((89.430593783, 44.1), (110.030593783, 44.1)):
            Hole(M2_5_CLEARANCE_HOLE1_D / 2, depth=M2_5_CLEARANCE_HOLE1_DEPTH)
            with Locations((0, 0, -(M2_5_CLEARANCE_HOLE1_DEPTH + M2_5_CLEARANCE_HOLE1_TIP / 2))):  # 118° drill point
                Cone(0, M2_5_CLEARANCE_HOLE1_D / 2, M2_5_CLEARANCE_HOLE1_TIP, mode=Mode.SUBTRACT)

    # Sketch21 → CSK for M3 socket countersunk head screw1 (revolve, cut)
    with BuildSketch(Plane(origin=(114.980593783, 55.2, -11.5), x_dir=(0, 0, -1), z_dir=(1, 0, 0))):
        Polygon((0, 0), (0, 3), (1.7, 3), (1.7, 1.77), (3.47, 0), align=None)
    csk_for_m3_socket_countersunk_head_screw = revolve(axis=Axis((114.980593783, 48.85, -11.5), (0, 1, 0)), mode=Mode.SUBTRACT)

    # CSK for M3 socket countersunk head s 2: CSK for M3 socket countersunk head screw1 ×2
    with Locations(*[(-i * CSK_FOR_M3_SOCKET_COUNTERSUNK_HEAD_S_2_PITCH, 0, 0) for i in range(1, CSK_FOR_M3_SOCKET_COUNTERSUNK_HEAD_S_2_COUNT)]):
        add(csk_for_m3_socket_countersunk_head_screw, mode=Mode.SUBTRACT)

    # CSK for M3 socket countersunk head s 3: CSK for M3 socket countersunk head screw1 ×2
    with Locations(*[(-i * CSK_FOR_M3_SOCKET_COUNTERSUNK_HEAD_S_3_PITCH, 0, 0) for i in range(1, CSK_FOR_M3_SOCKET_COUNTERSUNK_HEAD_S_3_COUNT)]):
        add(csk_for_m3_socket_countersunk_head_screw, mode=Mode.SUBTRACT)

    # CSK for M3 socket countersunk head s 4: CSK for M3 socket countersunk head screw1 ×2
    with Locations(*[(-i * CSK_FOR_M3_SOCKET_COUNTERSUNK_HEAD_S_4_PITCH, 0, 0) for i in range(1, CSK_FOR_M3_SOCKET_COUNTERSUNK_HEAD_S_4_COUNT)]):
        add(csk_for_m3_socket_countersunk_head_screw, mode=Mode.SUBTRACT)

    # Chamfer4
    chamfer4_edges = [part.edges().sort_by_distance(p)[0] for p in [
        (-30.519406217, 55.2, -45),
        (46.980593783, 55.2, 0),
        (-30.519406217, 12.1, 0),
    ]]
    chamfer(chamfer4_edges, length=CHAMFER4_SIZE)


solid = part.part
